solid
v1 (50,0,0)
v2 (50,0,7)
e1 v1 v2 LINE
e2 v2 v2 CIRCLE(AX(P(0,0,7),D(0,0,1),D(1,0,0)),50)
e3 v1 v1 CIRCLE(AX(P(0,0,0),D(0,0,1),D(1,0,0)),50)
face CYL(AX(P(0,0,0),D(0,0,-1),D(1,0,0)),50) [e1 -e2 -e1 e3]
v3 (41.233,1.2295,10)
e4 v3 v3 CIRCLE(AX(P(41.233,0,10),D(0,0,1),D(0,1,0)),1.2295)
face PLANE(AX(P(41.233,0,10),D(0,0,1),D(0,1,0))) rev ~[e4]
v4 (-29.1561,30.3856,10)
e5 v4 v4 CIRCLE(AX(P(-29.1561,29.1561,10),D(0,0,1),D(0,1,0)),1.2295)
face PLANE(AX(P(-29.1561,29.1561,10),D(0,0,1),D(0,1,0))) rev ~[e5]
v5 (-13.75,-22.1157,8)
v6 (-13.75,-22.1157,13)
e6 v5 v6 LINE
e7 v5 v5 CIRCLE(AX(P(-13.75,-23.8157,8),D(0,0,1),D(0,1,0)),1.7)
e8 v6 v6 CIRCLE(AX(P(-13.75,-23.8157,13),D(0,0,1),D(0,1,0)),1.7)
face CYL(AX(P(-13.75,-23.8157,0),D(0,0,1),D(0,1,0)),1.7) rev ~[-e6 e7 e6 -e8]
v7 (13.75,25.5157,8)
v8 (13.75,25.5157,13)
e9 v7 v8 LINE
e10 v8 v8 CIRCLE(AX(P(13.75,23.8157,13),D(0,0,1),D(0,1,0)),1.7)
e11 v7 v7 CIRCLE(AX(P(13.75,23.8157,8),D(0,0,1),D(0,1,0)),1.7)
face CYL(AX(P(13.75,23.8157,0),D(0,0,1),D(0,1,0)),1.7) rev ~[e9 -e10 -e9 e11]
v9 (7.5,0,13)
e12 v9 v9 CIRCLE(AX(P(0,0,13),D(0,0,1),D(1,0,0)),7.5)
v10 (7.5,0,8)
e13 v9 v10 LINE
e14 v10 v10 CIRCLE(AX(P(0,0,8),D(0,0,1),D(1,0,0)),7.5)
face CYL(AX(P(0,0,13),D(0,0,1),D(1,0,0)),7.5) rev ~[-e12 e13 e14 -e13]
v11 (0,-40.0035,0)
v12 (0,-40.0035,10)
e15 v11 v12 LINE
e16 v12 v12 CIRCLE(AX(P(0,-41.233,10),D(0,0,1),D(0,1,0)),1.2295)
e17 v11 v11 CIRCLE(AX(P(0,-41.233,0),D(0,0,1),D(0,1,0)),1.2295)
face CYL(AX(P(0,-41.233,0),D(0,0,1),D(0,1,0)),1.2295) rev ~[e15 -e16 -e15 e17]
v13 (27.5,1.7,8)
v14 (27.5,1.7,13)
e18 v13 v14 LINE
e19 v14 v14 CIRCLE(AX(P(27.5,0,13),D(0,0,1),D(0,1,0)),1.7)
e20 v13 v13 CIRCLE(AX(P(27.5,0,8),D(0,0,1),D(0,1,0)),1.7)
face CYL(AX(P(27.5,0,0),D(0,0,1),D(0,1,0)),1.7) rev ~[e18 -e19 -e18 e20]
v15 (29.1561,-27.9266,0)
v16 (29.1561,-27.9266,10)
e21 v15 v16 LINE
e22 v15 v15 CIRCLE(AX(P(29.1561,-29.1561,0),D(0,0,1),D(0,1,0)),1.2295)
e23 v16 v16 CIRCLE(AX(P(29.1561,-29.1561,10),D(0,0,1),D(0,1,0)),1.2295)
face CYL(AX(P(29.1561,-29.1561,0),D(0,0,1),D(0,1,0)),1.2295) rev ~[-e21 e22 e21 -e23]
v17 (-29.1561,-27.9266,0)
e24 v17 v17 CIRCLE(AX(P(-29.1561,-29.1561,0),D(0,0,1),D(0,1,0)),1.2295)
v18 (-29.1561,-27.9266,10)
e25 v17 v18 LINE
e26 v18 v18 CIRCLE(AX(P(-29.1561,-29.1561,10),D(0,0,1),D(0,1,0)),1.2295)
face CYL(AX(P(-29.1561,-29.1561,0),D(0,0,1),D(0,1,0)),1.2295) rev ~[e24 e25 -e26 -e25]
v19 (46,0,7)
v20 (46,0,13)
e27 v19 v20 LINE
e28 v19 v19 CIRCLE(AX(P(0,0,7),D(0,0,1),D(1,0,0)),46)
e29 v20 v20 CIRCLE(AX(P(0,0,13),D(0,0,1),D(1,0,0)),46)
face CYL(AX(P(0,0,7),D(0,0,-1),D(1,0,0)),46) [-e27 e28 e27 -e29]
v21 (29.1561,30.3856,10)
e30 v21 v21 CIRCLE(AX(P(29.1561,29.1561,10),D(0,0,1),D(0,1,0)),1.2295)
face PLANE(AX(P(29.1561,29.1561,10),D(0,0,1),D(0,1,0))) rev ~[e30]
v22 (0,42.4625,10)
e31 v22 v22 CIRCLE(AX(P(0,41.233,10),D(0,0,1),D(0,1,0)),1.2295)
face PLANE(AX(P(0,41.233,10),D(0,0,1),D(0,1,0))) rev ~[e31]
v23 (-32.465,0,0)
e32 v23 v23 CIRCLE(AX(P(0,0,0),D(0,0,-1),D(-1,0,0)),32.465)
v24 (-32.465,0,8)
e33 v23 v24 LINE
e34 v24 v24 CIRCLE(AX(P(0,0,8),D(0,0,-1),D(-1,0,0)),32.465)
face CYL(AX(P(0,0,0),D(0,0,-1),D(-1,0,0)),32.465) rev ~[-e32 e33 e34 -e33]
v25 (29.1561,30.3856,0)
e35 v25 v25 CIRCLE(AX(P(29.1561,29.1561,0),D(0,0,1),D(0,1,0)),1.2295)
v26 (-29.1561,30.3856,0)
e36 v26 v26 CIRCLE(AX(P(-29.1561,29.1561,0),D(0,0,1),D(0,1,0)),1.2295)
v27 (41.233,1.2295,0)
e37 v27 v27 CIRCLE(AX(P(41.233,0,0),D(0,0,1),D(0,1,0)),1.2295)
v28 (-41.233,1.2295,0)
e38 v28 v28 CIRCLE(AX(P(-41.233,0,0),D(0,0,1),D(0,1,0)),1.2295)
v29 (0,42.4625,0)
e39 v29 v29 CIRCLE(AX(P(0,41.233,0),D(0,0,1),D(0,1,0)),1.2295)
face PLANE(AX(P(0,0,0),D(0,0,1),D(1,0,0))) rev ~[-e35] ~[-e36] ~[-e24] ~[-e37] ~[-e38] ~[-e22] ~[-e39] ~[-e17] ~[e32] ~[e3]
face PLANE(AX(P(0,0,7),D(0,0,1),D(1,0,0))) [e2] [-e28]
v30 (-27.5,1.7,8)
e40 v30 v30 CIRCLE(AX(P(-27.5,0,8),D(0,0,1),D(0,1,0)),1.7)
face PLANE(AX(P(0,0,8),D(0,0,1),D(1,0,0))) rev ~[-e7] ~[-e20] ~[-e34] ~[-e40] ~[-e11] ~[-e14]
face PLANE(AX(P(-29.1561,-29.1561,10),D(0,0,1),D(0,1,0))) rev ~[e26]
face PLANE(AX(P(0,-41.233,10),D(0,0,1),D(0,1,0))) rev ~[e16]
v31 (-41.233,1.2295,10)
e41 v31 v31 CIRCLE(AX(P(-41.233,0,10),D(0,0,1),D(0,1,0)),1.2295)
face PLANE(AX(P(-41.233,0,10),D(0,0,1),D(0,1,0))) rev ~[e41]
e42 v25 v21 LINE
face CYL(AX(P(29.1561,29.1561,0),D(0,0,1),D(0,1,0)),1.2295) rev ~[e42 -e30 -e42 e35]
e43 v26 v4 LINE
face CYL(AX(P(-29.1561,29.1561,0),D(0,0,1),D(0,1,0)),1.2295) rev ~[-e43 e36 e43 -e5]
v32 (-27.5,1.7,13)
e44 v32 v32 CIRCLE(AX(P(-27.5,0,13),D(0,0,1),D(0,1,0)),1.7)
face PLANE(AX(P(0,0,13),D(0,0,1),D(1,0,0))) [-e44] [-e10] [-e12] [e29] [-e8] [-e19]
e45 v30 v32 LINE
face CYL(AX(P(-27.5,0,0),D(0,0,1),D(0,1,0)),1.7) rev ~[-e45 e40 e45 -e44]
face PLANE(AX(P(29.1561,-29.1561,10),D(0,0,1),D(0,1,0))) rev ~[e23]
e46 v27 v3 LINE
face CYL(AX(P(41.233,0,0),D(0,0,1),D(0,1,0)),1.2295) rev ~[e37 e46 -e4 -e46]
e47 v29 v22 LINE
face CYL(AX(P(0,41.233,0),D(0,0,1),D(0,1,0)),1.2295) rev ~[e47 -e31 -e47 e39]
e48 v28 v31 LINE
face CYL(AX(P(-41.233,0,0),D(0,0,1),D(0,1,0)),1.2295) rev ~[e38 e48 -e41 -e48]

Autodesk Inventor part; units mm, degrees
ref_plane "YZ Plane" through (0, 0, 0) normal (1, 0, 0) x (0, 1, 0)
sketch "Sketch1" plane through (0, 0, 0) normal (0, 0, 1) x (1, 0, 0)
  circle A0 centre (0, 0) radius 50
  circle A1 centre (0, 0) radius 12.5
  circle A2 centre (0, 0) radius 14.5
  line L0 (-15.5, -15.5) -> (15.5, -15.5) construction
  line L1 (15.5, -15.5) -> (15.5, 15.5) construction
  line L2 (15.5, 15.5) -> (-15.5, 15.5) construction
  line L3 (-15.5, 15.5) -> (-15.5, -15.5) construction
  line L4 (-15.5, -15.5) -> (15.5, 15.5) construction
  line L5 (15.5, -15.5) -> (-15.5, 15.5) construction
  dimension "Diametro" = 100
  dimension "d1" = 25
  dimension "d2" = 2
  dimension "d8" = 31
extrude "Extrusion1" add sketch "Sketch1" along normal blind 7 contours A0 | A2
extrude "Extrusion2" add sketch "Sketch1" along normal blind 100 contours A2
ref_plane "Work Plane1" through (0, 0, 22) normal (0, 0, 1) x (1, 0, 0)
sketch "Sketch2" plane through (0, 0, 22) normal (0, 0, 1) x (1, 0, 0)
  arc A0 (2.5, 24.8747) -> (-2.5, 24.8747) centre (0, 0) ccw
  line L0 (2.5, 24.8747) -> (2.5, 14.2829)
  line L1 (-2.5, 24.8747) -> (-2.5, 14.2829)
  line L2 (0, -70) -> (0, 70) projected
  circle A1 centre (0, 0) radius 14.5 projected
  point P0 (0, 25)
  dimension "d24" = 5
  dimension "d25" = 25
  dimension "Dedos" = 5
extrude "Extrusion3" add sketch "Sketch2" along normal blind 15 contours L0 A1 L2 A0 | L2 A1 L1 A0
sketch "Sketch3" plane through (0, 0, 0) normal (1, 0, 0) x (0, 1, 0)
  line L0 (25, 37) -> (24.8747, 37) projected
  line L1 (14.2829, 22) -> (14.5, 22) projected
  line L2 (25, 22) -> (25, 37) projected
  line L3 (14.2829, 22) -> (14.2829, 37) projected
  circle A0 centre (25.74, 29.5) radius 1.5
  line L4 (0, -7.4) -> (0, 44.4) projected
  point P0 (0, 0)
  point P1 (25, 29.5)
  dimension "d31" = 3
  dimension "d92" = 25.74
fillet "Fillet2" radius 8 1 edges at (0, 25, 22)
pattern_circular "Circular Pattern1" count 4 over 360 about axis through (0, 0, 0) along (0, 0, 1) of "Fillet2", "Extrusion3"
ref_plane "Plano de trabajo2" through (0, 0, 54) normal (0, 0, 1) x (1, 0, 0)
sketch "Boceto4" plane through (0, 0, 54) normal (0, 0, 1) x (1, 0, 0)
  circle A0 centre (0, 0) radius 17.5
  circle A1 centre (0, 0) radius 14.5 projected
  line L0 (4, -23.75) -> (4, -26.75) projected
  dimension "d54" = 35
extrude "Extrusión5" add sketch "Boceto4" against normal up to surface (47 mm away)
sketch "Boceto5" plane through (0, 0, 37) normal (0, 0, 1) x (0, 1, 0)
  arc A0 (-2.5, -17.3205) -> (2.5, -17.3205) centre (0, 0) ccw projected
  line L0 (-2.5, -17.3205) -> (-2.5, -24.8747) projected
  arc A1 (-2.5, -24.8747) -> (2.5, -24.8747) centre (0, 0) ccw projected
  line L1 (2.5, -24.8747) -> (2.5, -17.3205) projected
  circle A2 centre (0, 0) radius 14.5 projected
  line L2 (2.5, -17.3205) -> (2.5, -14.2829)
  line L3 (-2.5, -17.3205) -> (-2.5, -14.2829)
extrude "Extrusión6" add sketch "Boceto5" along normal blind 20 contours L3 A2 L2 A0 | A0 L1 A1 L0
fillet "Empalme4" radius 8 1 edges at (25, 0, 57)
pattern_circular "Patrón circular2" count 4 over 360 about axis through (0, 0, 54) along (0, 0, -1) of "Extrusión6", "Empalme4"
chamfer "Chaflán1" distance 2 angle 45 1 edges at (-14.5, 0, 100)
sketch "Boceto6" plane through (0, 0, 7) normal (0, 0, 1) x (1, 0, 0)
  circle A0 centre (0, 0) radius 50 projected
  arc A1 (17.3205, 2.5) -> (2.5, 17.3205) centre (0, 0) ccw construction
  line L0 (0, 0) -> (32.476, 18.75) construction
  arc A2 (17.3205, 2.5) -> (2.5, 17.3205) centre (0, 0) ccw construction
  point P0 (16.25, -6.4952)
  point P1 (16.25, 6.4952)
  point P2 (0, 37.5)
  point P3 (-32.476, 18.75)
  point P4 (-32.476, -18.75)
  point P5 (0, -37.5)
  point P6 (32.476, -18.75)
  point P7 (10.8253, 13.75)
  point P8 (15.1554, 8.75)
  dimension "d73" = 360
  dimension "d91" = 37.5
sketch "Boceto8" plane through (0, 0, 7) normal (0, 0, 1) x (1, 0, 0)
  circle A0 centre (0, 0) radius 17.5 projected
  circle A1 centre (0, 0) radius 50 projected
  circle A2 centre (0, 0) radius 46
  dimension "Espesor" = 4
extrude "Extrusión8" add sketch "Boceto8" along normal blind 6 contours A2
sketch "Boceto9" plane through (2.5, 14.0104, 54) normal (1, 0, 0) x (0, -1, 0)
  line L0 (16.5104, 0) -> (28.2932, 0) projected
  line L1 (-35.9896, 54) -> (64.0104, 54) projected
  point P0 (1.4018, 24.5)
  point P1 (22.4018, 0)
  dimension "d124" = 21
  dimension "d125" = 29.5
hole "Agujero4" at (2.5, 12.6086, 29.5) direction (-1, 0, 0) diameter 3.4 depth 5 clearance for "Tornillo de cabeza plana avellanada ISO 2009/7046" size "M3" standard "ISO"
pattern_circular "Patrón circular3" count 4 over 360 about axis through (0, 0, 54) along (0, 0, -1) of "Agujero4"
sketch "Boceto13" plane through (0, 0, 13) normal (0, 0, 1) x (1, 0, 0)
  point P0 (0, 0)
sketch "Boceto15" plane through (0, 0, 0) normal (0, 0, -1) x (-1, 0, 0)
  circle A0 centre (0, 0) radius 27.5 construction
  point P0 (27.5, 0)
  point P1 (13.75, 23.8157)
  point P2 (-13.75, 23.8157)
  point P3 (-27.5, 0)
  point P4 (-13.75, -23.8157)
  point P5 (13.75, -23.8157)
  dimension "d134" = 55
  dimension "d137" = 360
hole "Agujero8" at (-13.75, -23.8157, 0) at (13.75, -23.8157, 0) at (27.5, 0, 0) at (13.75, 23.8157, 0) at (-13.75, 23.8157, 0) at (-27.5, 0, 0) direction (0, 0, 1) diameter 3.4 end through all clearance for "Tornillo de cabeza cilíndrica ranurada ISO 1207" size "M3" standard "ISO"
sketch "Boceto16" plane through (0, 0, 0) normal (0, 0, -1) x (-1, 0, 0)
  circle A0 centre (0, 0) radius 32.465
  dimension "d146" = 64.93
extrude "Extrusión10" cut sketch "Boceto16" against normal blind 8
sketch "Boceto18" plane through (0, 0, 0) normal (0, 0, -1) x (-1, 0, 0)
  point P0 (0, 0)
  point P1 (-41.233, 0)
  point P2 (-29.1561, -29.1561)
  point P3 (0, -41.233)
  point P4 (29.1561, -29.1561)
  point P5 (41.233, 0)
  point P6 (29.1561, 29.1561)
  point P7 (0, 41.233)
  point P8 (-29.1561, 29.1561)
  dimension "d162" = 41.233
  dimension "d165" = 360
hole "Agujero10" at (41.233, 0, 0) at (29.1561, -29.1561, 0) at (0, -41.233, 0) at (-29.1561, -29.1561, 0) at (-41.233, 0, 0) at (-29.1561, 29.1561, 0) at (0, 41.233, 0) at (29.1561, 29.1561, 0) direction (0, 0, 1) diameter 2.459 depth 10 thread size "M3x0.5" class "6H" standard "ISO Metric profile"
sketch "Sketch19" plane through (14.2829, -2.5, 54) normal (0, -1, 0) x (1, 0, 0)
  circle A0 centre (6.7167, -24.5) radius 1.7
  line L0 (3.0377, 0) -> (3.0377, -31.9844) projected
  line L1 (3.0377, 0) -> (-11.7829, 0) projected
  point P0 (-14.2829, -54)
  dimension "d174" = 3.4
  dimension "d175" = 3.679
  dimension "d176" = 24.5
hole "Hole11" at (20.9995, -2.5, 29.5) direction (0, 1, 0) diameter 4 depth 5
pattern_circular "Circular Pattern4" count 4 over 360 about axis through (0, 0, 0) along (0, 0, 1) of "Hole11"
sketch "Sketch20" plane through (0, 0, 13) normal (0, 0, 1) x (1, 0, 0)
  circle A0 centre (-27.5, 0) radius 1.7 projected
  circle A1 centre (-13.75, 23.8157) radius 1.7 projected
  circle A2 centre (13.75, 23.8157) radius 1.7 projected
  circle A3 centre (27.5, 0) radius 1.7 projected
  circle A4 centre (13.75, -23.8157) radius 1.7 projected
  circle A5 centre (-13.75, -23.8157) radius 1.7 projected
  circle A6 centre (0, 0) radius 46 projected
  circle A7 centre (0, 0) radius 17.5 projected
  circle A8 centre (0, 0) radius 46
extrude "Extrusion12" cut sketch "Sketch20" along normal up to surface contours A6 | A7
sketch "Sketch21" plane through (0, 0, 13) normal (0, 0, 1) x (1, 0, 0)
  circle A0 centre (0, 0) radius 12.5 projected
  circle A1 centre (-27.5, 0) radius 1.7 projected
  circle A2 centre (-13.75, 23.8157) radius 1.7 projected
  circle A3 centre (13.75, 23.8157) radius 1.7 projected
  circle A4 centre (27.5, 0) radius 1.7 projected
  circle A5 centre (13.75, -23.8157) radius 1.7 projected
  circle A6 centre (-13.75, -23.8157) radius 1.7 projected
  circle A7 centre (0, 0) radius 46 projected
  circle A8 centre (-13.75, 23.8157) radius 1.7
  circle A9 centre (13.75, -23.8157) radius 1.7
extrude "Extrusion13" add sketch "Sketch21" against normal up to surface (5 mm away) contours A2 | A5
sketch "Sketch23" plane through (0, 0, 13) normal (0, 0, 1) x (1, 0, 0)
  circle A0 centre (0, 0) radius 12.5 projected
  circle A1 centre (-27.5, 0) radius 1.7 projected
  circle A2 centre (13.75, 23.8157) radius 1.7 projected
  circle A3 centre (27.5, 0) radius 1.7 projected
  circle A4 centre (-13.75, -23.8157) radius 1.7 projected
  circle A5 centre (0, 0) radius 46 projected
  circle A6 centre (0, 0) radius 7.5
  dimension "d192" = 15
extrude "Extrusion14" add sketch "Sketch23" against normal up to surface (5 mm away) contours A0
equation "\"d24\" = Dedos"
equation "\"d91\" = 0.375 * Diametro"
properties part number "Soporte22" material "Aluminum 7075"
